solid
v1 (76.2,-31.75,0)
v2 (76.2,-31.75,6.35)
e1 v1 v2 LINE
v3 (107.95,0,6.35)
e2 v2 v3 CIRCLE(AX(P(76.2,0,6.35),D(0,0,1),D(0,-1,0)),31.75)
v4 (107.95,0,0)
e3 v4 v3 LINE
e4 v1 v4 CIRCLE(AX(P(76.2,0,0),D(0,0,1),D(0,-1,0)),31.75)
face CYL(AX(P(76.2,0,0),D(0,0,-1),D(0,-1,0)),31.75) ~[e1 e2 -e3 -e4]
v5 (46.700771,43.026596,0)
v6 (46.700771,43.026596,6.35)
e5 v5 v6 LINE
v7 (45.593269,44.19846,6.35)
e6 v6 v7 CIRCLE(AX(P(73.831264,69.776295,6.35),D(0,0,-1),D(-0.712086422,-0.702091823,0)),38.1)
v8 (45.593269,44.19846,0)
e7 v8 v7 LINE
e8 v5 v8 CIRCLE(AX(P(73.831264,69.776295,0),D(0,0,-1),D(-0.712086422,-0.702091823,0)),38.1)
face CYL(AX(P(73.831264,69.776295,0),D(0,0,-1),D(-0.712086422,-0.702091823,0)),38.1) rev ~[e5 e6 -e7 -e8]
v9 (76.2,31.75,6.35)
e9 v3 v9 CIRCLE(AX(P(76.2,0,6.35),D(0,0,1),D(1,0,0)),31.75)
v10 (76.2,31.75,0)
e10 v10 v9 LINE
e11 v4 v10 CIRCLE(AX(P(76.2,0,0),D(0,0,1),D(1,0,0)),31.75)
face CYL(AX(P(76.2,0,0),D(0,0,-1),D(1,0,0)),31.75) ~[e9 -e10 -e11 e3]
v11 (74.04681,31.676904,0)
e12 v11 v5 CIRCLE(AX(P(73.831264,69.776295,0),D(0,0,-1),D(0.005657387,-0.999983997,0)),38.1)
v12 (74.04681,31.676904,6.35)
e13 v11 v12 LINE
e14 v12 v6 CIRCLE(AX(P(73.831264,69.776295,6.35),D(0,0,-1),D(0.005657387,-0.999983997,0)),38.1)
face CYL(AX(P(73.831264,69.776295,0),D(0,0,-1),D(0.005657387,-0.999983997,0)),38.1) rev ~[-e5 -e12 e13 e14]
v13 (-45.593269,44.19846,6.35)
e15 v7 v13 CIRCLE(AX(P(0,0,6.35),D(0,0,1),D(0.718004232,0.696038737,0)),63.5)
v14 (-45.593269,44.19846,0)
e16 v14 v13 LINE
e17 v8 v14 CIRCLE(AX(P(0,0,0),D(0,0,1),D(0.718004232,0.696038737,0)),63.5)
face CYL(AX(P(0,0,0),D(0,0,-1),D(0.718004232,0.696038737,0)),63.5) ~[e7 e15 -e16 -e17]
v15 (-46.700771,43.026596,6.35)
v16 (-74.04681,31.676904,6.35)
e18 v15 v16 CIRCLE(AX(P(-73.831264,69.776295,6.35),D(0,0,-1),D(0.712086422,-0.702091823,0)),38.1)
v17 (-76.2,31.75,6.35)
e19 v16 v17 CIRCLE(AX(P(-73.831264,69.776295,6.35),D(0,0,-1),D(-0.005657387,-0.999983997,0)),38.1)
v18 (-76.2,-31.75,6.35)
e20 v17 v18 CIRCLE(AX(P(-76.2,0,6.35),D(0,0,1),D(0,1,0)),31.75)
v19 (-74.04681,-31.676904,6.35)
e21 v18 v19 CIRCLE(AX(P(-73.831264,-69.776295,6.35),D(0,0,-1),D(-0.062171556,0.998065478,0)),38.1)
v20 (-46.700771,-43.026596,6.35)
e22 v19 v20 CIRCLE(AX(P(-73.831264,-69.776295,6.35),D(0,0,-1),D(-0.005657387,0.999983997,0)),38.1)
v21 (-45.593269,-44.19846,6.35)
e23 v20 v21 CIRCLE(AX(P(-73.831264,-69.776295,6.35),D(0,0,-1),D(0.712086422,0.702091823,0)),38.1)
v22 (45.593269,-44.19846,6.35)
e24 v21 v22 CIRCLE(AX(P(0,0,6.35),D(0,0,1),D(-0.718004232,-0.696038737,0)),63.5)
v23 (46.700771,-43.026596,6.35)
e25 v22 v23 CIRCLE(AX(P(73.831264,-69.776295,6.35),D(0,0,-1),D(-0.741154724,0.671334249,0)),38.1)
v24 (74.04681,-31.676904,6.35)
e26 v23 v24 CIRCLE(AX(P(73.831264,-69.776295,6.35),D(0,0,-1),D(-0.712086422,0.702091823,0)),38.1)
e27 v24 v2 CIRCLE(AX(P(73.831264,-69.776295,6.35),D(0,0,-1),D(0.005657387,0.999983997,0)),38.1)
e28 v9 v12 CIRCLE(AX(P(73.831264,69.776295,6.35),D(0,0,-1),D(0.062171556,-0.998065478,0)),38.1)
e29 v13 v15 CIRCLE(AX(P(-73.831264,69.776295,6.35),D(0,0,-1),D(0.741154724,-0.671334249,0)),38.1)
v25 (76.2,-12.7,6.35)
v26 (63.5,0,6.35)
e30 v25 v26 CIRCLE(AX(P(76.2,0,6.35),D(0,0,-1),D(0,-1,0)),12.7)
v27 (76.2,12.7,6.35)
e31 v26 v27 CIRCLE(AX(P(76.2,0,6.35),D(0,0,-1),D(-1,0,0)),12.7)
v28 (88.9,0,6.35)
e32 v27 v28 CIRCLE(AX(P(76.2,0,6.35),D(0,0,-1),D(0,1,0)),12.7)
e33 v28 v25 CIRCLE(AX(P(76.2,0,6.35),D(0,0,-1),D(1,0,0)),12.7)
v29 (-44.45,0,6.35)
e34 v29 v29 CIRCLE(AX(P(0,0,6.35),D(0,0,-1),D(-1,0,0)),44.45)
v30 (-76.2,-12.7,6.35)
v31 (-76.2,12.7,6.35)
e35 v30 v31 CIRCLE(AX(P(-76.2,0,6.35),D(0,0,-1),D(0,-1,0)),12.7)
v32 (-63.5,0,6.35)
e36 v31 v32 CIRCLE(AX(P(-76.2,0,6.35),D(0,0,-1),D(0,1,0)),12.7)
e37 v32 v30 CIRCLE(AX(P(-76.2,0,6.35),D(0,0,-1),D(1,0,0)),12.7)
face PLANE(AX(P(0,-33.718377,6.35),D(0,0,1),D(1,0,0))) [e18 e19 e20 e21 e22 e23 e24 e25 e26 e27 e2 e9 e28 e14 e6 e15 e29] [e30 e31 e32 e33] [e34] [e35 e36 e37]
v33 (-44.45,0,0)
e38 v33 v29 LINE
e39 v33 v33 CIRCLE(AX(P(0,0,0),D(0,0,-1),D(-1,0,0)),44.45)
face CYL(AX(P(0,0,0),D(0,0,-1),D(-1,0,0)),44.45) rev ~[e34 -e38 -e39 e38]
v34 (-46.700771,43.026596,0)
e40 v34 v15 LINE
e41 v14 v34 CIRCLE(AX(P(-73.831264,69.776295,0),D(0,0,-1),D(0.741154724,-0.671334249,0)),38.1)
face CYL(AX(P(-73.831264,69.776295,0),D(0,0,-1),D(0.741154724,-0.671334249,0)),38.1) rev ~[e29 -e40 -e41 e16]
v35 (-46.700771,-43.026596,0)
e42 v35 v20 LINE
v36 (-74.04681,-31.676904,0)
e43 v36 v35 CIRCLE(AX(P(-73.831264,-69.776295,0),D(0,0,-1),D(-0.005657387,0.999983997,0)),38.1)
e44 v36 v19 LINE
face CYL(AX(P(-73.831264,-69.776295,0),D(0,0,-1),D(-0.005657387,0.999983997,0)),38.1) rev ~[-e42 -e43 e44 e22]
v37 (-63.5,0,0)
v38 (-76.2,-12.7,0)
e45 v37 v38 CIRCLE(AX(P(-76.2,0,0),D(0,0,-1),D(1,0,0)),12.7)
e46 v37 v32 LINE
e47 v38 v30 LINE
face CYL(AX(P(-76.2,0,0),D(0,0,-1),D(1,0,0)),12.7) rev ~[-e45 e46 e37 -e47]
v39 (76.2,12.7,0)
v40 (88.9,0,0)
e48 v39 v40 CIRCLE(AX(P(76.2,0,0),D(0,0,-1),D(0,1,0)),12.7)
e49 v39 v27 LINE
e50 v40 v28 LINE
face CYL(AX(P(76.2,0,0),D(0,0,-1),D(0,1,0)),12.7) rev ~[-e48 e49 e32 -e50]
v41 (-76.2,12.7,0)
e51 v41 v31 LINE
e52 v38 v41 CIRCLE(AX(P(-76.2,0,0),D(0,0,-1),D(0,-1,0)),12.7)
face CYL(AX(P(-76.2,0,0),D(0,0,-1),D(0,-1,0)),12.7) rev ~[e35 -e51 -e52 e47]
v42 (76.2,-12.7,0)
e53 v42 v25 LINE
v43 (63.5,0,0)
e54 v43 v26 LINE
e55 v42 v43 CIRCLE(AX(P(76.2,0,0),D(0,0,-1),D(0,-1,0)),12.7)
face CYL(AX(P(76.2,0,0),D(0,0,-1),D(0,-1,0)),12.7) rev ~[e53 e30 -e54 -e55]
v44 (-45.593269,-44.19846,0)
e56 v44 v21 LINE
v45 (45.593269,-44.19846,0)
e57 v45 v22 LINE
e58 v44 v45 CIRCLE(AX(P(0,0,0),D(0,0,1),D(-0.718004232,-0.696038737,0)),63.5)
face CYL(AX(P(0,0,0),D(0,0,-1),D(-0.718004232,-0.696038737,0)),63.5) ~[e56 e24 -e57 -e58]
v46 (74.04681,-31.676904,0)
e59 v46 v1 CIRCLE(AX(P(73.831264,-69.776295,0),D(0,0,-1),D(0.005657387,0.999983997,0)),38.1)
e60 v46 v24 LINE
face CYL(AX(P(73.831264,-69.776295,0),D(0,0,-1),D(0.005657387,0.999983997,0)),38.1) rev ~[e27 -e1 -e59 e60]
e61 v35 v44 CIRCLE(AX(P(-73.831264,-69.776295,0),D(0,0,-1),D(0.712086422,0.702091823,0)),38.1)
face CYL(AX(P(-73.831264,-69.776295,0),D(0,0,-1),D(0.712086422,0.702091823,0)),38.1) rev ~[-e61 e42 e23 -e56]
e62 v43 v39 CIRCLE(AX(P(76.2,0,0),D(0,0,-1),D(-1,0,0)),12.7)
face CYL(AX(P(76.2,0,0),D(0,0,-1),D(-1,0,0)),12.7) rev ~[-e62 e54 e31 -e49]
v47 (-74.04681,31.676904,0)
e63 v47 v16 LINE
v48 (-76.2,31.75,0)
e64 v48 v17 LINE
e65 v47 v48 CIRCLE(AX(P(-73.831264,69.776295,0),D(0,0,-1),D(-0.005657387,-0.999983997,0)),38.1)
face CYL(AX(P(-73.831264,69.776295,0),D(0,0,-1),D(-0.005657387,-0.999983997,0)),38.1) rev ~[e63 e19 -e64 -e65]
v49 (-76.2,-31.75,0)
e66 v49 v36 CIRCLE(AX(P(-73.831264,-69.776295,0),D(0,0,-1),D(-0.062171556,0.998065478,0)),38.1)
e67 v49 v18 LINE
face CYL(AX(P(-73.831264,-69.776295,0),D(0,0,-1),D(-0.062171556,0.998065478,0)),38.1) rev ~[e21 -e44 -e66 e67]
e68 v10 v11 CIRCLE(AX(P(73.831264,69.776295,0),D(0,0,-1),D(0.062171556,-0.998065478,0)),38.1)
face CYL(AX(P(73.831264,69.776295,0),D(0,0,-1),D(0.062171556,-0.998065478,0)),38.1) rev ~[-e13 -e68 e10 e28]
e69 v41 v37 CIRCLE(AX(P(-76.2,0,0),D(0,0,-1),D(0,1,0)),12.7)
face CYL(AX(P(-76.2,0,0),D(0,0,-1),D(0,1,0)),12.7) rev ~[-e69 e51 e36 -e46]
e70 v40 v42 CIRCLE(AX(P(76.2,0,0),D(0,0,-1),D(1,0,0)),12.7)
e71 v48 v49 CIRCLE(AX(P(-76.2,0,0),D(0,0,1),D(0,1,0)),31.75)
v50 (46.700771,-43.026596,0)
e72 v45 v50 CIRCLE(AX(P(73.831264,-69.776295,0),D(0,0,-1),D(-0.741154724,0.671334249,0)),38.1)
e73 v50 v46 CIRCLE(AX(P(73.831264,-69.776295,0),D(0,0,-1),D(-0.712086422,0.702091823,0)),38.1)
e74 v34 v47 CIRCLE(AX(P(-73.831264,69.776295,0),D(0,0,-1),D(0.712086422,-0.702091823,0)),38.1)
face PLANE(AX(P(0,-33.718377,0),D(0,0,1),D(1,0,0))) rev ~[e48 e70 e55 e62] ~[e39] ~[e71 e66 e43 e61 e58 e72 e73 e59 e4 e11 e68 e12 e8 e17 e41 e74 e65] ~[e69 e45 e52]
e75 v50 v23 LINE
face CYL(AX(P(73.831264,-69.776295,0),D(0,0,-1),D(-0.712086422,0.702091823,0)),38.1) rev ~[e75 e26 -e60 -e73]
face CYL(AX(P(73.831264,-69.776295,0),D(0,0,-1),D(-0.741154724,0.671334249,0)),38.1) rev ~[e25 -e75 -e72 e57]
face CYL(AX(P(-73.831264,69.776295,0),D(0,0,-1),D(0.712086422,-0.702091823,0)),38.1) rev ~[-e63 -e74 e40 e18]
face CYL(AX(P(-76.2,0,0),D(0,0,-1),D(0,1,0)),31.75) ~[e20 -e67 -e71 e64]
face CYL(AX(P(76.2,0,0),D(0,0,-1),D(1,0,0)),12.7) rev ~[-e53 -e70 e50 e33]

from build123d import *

# Parameters (mm, degrees)
F1_DEPTH = 6.35


with BuildPart() as f1:
    # F0 (on Top) → F1 (new body)
    with BuildSketch(Plane.XY):
        with BuildLine():
            ThreePointArc((57.94375, -25.976370723), (48.024670033, -14.636026826), (44.45, 0))
            ThreePointArc((44.45, 0), (0, -44.45), (-44.45, 0))
            ThreePointArc((-44.45, 0), (-48.024670033, -14.636026826), (-57.94375, -25.976370723))
            ThreePointArc((-57.94375, -25.976370723), (-53.0122296555, -34.9564515783), (-46.7007710297, -43.0265962543))
            ThreePointArc((-46.7007710297, -43.0265962543), (-46.1408199964, -43.6066686624), (-45.5932687094, -44.1984597966))
            ThreePointArc((-45.5932687094, -44.1984597966), (0, -63.5), (45.5932687094, -44.1984597966))
            ThreePointArc((45.5932687094, -44.1984597966), (46.1408199964, -43.6066686624), (46.7007710297, -43.0265962543))
            ThreePointArc((46.7007710297, -43.0265962543), (53.0122296555, -34.9564515783), (57.94375, -25.976370723))
        make_face()
        with BuildLine():
            ThreePointArc((57.94375, 25.976370723), (48.024670033, 14.636026826), (44.45, 0))
            Line((44.45, 0), (63.5, 0))
            ThreePointArc((63.5, 0), (62.0954029096, 13.2819779212), (57.94375, 25.976370723))
        make_face()
        with BuildLine():
            ThreePointArc((-44.45, 0), (0, 44.45), (44.45, 0))
            ThreePointArc((44.45, 0), (48.024670033, 14.636026826), (57.94375, 25.976370723))
            ThreePointArc((57.94375, 25.976370723), (53.0122296555, 34.9564515783), (46.7007710297, 43.0265962543))
            ThreePointArc((46.7007710297, 43.0265962543), (46.1408199964, 43.6066686624), (45.5932687094, 44.1984597966))
            ThreePointArc((45.5932687094, 44.1984597966), (0, 63.5), (-45.5932687094, 44.1984597966))
            ThreePointArc((-45.5932687094, 44.1984597966), (-46.1408199964, 43.6066686624), (-46.7007710297, 43.0265962543))
            ThreePointArc((-46.7007710297, 43.0265962543), (-53.0122296555, 34.9564515783), (-57.94375, 25.976370723))
            ThreePointArc((-57.94375, 25.976370723), (-48.024670033, 14.636026826), (-44.45, 0))
        make_face()
        with BuildLine():
            Line((63.5, 0), (44.45, 0))
            ThreePointArc((44.45, 0), (48.024670033, -14.636026826), (57.94375, -25.976370723))
            ThreePointArc((57.94375, -25.976370723), (62.0954029096, -13.2819779212), (63.5, 0))
        make_face()
        with BuildLine():
            ThreePointArc((-57.94375, -25.976370723), (-48.024670033, -14.636026826), (-44.45, 0))
            Line((-44.45, 0), (-63.5, 0))
            ThreePointArc((-63.5, 0), (-62.0954029096, -13.2819779212), (-57.94375, -25.976370723))
        make_face()
        with BuildLine():
            Line((-63.5, 0), (-44.45, 0))
            ThreePointArc((-44.45, 0), (-48.024670033, 14.636026826), (-57.94375, 25.976370723))
            ThreePointArc((-57.94375, 25.976370723), (-62.0954029096, 13.2819779212), (-63.5, 0))
        make_face()
        with BuildLine():
            ThreePointArc((76.2, -12.7), (67.2197438789, -8.9802561211), (63.5, 0))
            ThreePointArc((63.5, 0), (62.0954029096, -13.2819779212), (57.94375, -25.976370723))
            ThreePointArc((57.94375, -25.976370723), (65.6047024614, -29.9299543947), (74.0468101417, -31.6769044168))
            ThreePointArc((74.0468101417, -31.6769044168), (75.1239218386, -31.6982296864), (76.2, -31.75))
            Line((76.2, -31.75), (76.2, -12.7))
        make_face()
        with BuildLine():
            ThreePointArc((57.94375, 25.976370723), (62.0954029096, 13.2819779212), (63.5, 0))
            ThreePointArc((63.5, 0), (67.2197438789, 8.9802561211), (76.2, 12.7))
            Line((76.2, 12.7), (76.2, 31.75))
            ThreePointArc((76.2, 31.75), (75.1239218386, 31.6982296864), (74.0468101417, 31.6769044168))
            ThreePointArc((74.0468101417, 31.6769044168), (65.6047024614, 29.9299543947), (57.94375, 25.976370723))
        make_face()
        with BuildLine():
            ThreePointArc((46.7007710297, 43.0265962543), (53.0122296555, 34.9564515783), (57.94375, 25.976370723))
            ThreePointArc((57.94375, 25.976370723), (65.6047024614, 29.9299543947), (74.0468101417, 31.6769044168))
            ThreePointArc((74.0468101417, 31.6769044168), (59.2262146143, 34.5867715285), (46.7007710297, 43.0265962543))
        make_face()
        with BuildLine():
            ThreePointArc((74.0468101417, -31.6769044168), (65.6047024614, -29.9299543947), (57.94375, -25.976370723))
            ThreePointArc((57.94375, -25.976370723), (53.0122296555, -34.9564515783), (46.7007710297, -43.0265962543))
            ThreePointArc((46.7007710297, -43.0265962543), (59.2262146143, -34.5867715285), (74.0468101417, -31.6769044168))
        make_face()
        with BuildLine():
            ThreePointArc((-76.2, 12.7), (-67.2197438789, 8.9802561211), (-63.5, 0))
            ThreePointArc((-63.5, 0), (-62.0954029096, 13.2819779212), (-57.94375, 25.976370723))
            ThreePointArc((-57.94375, 25.976370723), (-65.6047024614, 29.9299543947), (-74.0468101417, 31.6769044168))
            ThreePointArc((-74.0468101417, 31.6769044168), (-75.1239218386, 31.6982296864), (-76.2, 31.75))
            Line((-76.2, 31.75), (-76.2, 12.7))
        make_face()
        with BuildLine():
            ThreePointArc((-57.94375, -25.976370723), (-62.0954029096, -13.2819779212), (-63.5, 0))
            ThreePointArc((-63.5, 0), (-67.2197438789, -8.9802561211), (-76.2, -12.7))
            Line((-76.2, -12.7), (-76.2, -31.75))
            ThreePointArc((-76.2, -31.75), (-75.1239218386, -31.6982296864), (-74.0468101417, -31.6769044168))
            ThreePointArc((-74.0468101417, -31.6769044168), (-65.6047024614, -29.9299543947), (-57.94375, -25.976370723))
        make_face()
        with BuildLine():
            ThreePointArc((-74.0468101417, 31.6769044168), (-65.6047024614, 29.9299543947), (-57.94375, 25.976370723))
            ThreePointArc((-57.94375, 25.976370723), (-53.0122296555, 34.9564515783), (-46.7007710297, 43.0265962543))
            ThreePointArc((-46.7007710297, 43.0265962543), (-59.2262146143, 34.5867715285), (-74.0468101417, 31.6769044168))
        make_face()
        with BuildLine():
            ThreePointArc((-46.7007710297, -43.0265962543), (-53.0122296555, -34.9564515783), (-57.94375, -25.976370723))
            ThreePointArc((-57.94375, -25.976370723), (-65.6047024614, -29.9299543947), (-74.0468101417, -31.6769044168))
            ThreePointArc((-74.0468101417, -31.6769044168), (-59.2262146143, -34.5867715285), (-46.7007710297, -43.0265962543))
        make_face()
        with BuildLine():
            Line((76.2, 31.75), (76.2, 12.7))
            ThreePointArc((76.2, 12.7), (85.1802561211, 8.9802561211), (88.9, 0))
            ThreePointArc((88.9, 0), (85.1802561211, -8.9802561211), (76.2, -12.7))
            Line((76.2, -12.7), (76.2, -31.75))
            ThreePointArc((76.2, -31.75), (98.6506403027, -22.4506403027), (107.95, 0))
            ThreePointArc((107.95, 0), (98.6506403027, 22.4506403027), (76.2, 31.75))
        make_face()
        with BuildLine():
            ThreePointArc((-76.2, -12.7), (-88.9, 0), (-76.2, 12.7))
            Line((-76.2, 12.7), (-76.2, 31.75))
            ThreePointArc((-76.2, 31.75), (-107.95, 0), (-76.2, -31.75))
            Line((-76.2, -31.75), (-76.2, -12.7))
        make_face()
    extrude(amount=F1_DEPTH)


solid = f1.part
